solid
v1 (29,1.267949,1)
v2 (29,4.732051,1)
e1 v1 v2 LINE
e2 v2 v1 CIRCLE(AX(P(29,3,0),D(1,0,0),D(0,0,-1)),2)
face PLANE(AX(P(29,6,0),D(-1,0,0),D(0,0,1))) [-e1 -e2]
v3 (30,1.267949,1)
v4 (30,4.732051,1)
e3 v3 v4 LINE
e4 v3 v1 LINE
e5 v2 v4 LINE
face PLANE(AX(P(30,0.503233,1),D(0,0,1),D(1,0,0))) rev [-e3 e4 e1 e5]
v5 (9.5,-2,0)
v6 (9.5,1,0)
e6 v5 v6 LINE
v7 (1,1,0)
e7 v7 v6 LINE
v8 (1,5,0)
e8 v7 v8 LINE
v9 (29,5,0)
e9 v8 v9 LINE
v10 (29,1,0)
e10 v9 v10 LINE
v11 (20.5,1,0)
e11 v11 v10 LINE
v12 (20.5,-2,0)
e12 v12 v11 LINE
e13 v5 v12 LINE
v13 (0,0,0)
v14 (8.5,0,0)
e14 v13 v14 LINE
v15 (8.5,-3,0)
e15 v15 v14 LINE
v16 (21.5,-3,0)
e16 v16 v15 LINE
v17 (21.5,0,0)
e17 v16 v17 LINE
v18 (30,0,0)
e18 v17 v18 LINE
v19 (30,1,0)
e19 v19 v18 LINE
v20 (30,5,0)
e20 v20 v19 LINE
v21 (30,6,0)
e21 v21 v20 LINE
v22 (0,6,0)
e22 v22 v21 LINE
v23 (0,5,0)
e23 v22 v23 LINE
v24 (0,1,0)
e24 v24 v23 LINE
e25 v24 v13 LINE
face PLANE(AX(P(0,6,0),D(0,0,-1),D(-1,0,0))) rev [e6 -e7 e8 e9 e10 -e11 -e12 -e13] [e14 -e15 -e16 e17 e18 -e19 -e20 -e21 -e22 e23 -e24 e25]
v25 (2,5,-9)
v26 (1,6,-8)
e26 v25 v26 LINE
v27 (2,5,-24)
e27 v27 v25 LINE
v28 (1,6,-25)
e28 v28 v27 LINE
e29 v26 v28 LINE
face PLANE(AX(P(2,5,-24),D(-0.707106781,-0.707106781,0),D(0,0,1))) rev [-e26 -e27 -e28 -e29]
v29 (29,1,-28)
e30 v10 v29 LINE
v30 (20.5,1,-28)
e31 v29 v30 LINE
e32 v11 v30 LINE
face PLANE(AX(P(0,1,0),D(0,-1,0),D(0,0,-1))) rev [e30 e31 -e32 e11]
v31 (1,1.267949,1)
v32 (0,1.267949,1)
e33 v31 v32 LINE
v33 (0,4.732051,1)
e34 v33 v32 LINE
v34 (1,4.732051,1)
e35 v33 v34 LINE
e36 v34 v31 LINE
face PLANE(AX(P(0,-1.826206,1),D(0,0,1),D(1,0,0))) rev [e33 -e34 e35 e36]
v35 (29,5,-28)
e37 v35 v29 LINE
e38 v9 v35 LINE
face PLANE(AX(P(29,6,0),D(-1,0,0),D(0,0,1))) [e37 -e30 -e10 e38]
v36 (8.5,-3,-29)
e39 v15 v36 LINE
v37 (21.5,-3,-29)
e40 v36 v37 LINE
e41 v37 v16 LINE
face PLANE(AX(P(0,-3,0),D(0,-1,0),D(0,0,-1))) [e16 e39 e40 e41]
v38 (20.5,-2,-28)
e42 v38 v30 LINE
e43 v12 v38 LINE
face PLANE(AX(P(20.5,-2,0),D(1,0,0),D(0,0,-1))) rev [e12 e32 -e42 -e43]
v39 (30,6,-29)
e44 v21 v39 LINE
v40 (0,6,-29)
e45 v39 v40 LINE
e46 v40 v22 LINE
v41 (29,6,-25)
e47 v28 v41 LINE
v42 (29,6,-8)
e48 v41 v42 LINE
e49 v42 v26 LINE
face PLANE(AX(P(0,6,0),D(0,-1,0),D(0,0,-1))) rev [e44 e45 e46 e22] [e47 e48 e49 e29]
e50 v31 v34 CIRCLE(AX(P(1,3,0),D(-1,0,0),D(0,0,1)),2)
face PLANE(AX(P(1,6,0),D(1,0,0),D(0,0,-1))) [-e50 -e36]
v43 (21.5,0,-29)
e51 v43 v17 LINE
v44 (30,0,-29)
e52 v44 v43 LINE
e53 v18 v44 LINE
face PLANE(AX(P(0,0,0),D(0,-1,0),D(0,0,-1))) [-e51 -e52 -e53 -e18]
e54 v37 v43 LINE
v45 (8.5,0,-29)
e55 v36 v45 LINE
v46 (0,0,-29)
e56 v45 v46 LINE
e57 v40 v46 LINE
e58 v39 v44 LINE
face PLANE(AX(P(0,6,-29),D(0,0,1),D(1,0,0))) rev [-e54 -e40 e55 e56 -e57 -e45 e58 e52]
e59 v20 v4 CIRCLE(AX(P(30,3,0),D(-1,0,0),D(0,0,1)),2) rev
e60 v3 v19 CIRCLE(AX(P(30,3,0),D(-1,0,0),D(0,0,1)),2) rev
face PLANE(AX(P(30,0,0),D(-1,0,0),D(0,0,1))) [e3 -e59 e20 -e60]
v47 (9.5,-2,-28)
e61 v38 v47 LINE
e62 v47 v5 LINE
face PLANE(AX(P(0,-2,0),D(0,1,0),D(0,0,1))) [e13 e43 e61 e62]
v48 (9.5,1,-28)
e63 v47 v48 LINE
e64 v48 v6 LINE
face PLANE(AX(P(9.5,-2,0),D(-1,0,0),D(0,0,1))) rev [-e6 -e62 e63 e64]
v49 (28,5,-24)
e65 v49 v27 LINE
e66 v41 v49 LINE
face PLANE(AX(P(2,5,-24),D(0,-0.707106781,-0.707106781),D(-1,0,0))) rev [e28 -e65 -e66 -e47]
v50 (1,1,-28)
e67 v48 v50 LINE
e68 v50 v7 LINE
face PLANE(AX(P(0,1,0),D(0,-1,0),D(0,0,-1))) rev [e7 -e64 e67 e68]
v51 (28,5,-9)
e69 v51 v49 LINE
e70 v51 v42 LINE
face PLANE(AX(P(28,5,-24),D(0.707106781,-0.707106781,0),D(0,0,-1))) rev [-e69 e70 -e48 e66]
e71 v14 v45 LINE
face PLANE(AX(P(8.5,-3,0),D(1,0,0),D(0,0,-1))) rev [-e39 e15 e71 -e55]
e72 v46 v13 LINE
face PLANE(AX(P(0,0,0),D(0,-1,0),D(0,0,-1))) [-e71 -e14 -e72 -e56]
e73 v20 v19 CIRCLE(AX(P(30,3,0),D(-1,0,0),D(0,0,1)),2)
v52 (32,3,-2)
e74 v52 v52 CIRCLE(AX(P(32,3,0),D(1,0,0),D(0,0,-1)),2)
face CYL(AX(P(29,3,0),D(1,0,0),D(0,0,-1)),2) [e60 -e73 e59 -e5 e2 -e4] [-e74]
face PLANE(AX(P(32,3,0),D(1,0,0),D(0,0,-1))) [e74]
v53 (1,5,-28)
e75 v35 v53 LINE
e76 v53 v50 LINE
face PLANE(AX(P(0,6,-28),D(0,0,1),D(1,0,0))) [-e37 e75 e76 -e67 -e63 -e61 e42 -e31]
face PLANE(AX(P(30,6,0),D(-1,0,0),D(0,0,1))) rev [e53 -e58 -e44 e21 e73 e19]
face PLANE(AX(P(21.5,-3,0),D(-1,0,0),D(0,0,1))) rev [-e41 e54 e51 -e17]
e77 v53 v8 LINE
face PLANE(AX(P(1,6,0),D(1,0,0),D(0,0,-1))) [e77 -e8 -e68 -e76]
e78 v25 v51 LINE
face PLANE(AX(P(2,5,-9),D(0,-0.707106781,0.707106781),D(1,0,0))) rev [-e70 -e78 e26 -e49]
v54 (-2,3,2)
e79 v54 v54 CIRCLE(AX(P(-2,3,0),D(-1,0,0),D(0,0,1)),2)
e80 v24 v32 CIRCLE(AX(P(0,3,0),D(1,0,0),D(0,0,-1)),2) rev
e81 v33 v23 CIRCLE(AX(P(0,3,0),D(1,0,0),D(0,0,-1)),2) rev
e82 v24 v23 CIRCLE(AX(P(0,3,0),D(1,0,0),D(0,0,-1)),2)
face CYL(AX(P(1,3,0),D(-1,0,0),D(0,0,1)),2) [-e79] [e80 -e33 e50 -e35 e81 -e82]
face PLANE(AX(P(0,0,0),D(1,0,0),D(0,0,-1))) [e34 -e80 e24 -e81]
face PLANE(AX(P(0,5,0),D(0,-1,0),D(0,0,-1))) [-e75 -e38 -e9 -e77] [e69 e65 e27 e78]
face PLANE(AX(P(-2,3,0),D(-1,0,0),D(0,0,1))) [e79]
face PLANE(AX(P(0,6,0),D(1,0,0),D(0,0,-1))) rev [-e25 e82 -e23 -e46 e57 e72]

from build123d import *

# Parameters (mm, degrees)
ESQUISSE1_W             = 30
ESQUISSE1_H             = 29
BOSS_EXTRU_1_DEPTH      = 6
COQUE1_T                = -1
ENL_V_MAT_EXTRU_1_REACH = 44.154
ESQUISSE2_W             = 26
ESQUISSE2_H             = 15
ESQUISSE3_W             = 13
ESQUISSE3_H             = 29
BOSS_EXTRU_2_DEPTH      = 3
ESQUISSE5_W             = 11
ESQUISSE5_H             = 28
ENL_V_MAT_EXTRU_2_DEPTH = 3
BOSS_EXTRU_3_DEPTH      = 2
BOSS_EXTRU_3_DEPTH_BACK = 1
ESQUISSE6_R             = 2
BOSS_EXTRU_4_DEPTH      = 2
BOSS_EXTRU_4_DEPTH_BACK = 1
ESQUISSE7_R             = 2
CHANFREIN1_SIZE         = 1
ESQUISSE11_W            = 1
ESQUISSE11_H            = 5.866928615
ENL_V_MAT_EXTRU_5_DEPTH = 1
ESQUISSE12_W            = 1
ESQUISSE12_H            = 9.243044447
ENL_V_MAT_EXTRU_6_DEPTH = 1


with BuildPart() as part:
    # Esquisse1 → Boss.-Extru.1 (new body)
    with BuildSketch(Plane(origin=(0, 0, 0), x_dir=(1, 0, 0), z_dir=(0, 1, 0))):
        with Locations((15, 14.5)):
            Rectangle(ESQUISSE1_W, ESQUISSE1_H)
    extrude(amount=BOSS_EXTRU_1_DEPTH)

    # Coque1
    coque1_openings = [part.faces().sort_by_distance(p)[0] for p in [
        (15, 3, 0),
    ]]
    offset(amount=COQUE1_T, openings=coque1_openings, kind=Kind.INTERSECTION)

    # Esquisse2 → Enlèv. mat.-Extru.1 (cut, up to next)
    with BuildSketch(Plane(origin=(0, 6, 0), x_dir=(1, 0, 0), z_dir=(0, 1, 0)), mode=Mode.PRIVATE) as enl_v_mat_extru_1_sk1:
        with Locations((15, 16.5)):
            Rectangle(ESQUISSE2_W, ESQUISSE2_H)
    enl_v_mat_extru_1_tool1 = extrude(enl_v_mat_extru_1_sk1.sketch, amount=-ENL_V_MAT_EXTRU_1_REACH, mode=Mode.PRIVATE) & part.part
    add(enl_v_mat_extru_1_tool1.solids().sort_by_distance((15, 6, -16.5))[0], mode=Mode.SUBTRACT)

    # Esquisse3 → Boss.-Extru.2 (add)
    with BuildSketch(Plane.XZ):
        with Locations((15, -14.5)):
            Rectangle(ESQUISSE3_W, ESQUISSE3_H)
    extrude(amount=BOSS_EXTRU_2_DEPTH)

    # Esquisse5 → Enlèv. mat.-Extru.2 (cut)
    with BuildSketch(Plane(origin=(0, 1, 0), x_dir=(1, 0, 0), z_dir=(0, 1, 0))):
        with Locations((15, 14)):
            Rectangle(ESQUISSE5_W, ESQUISSE5_H)
    extrude(amount=-ENL_V_MAT_EXTRU_2_DEPTH, mode=Mode.SUBTRACT)

    # Esquisse6 → Boss.-Extru.3 (add, two sides: drawn at the far end of the back side and taken through both)
    with BuildSketch(Plane(origin=(30, 0, 0), x_dir=(0, 0, -1), z_dir=(1, 0, 0)).offset(-BOSS_EXTRU_3_DEPTH_BACK)):
        with Locations((0, 3)):
            Circle(ESQUISSE6_R)
    extrude(amount=BOSS_EXTRU_3_DEPTH + BOSS_EXTRU_3_DEPTH_BACK)

    # Esquisse7 → Boss.-Extru.4 (add, two sides: drawn at the far end of the back side and taken through both)
    with BuildSketch(Plane.ZY.offset(-BOSS_EXTRU_4_DEPTH_BACK)):
        with Locations(Location((0, 3, 0), (0, 0, 180))):
            Circle(ESQUISSE7_R)
    extrude(amount=BOSS_EXTRU_4_DEPTH + BOSS_EXTRU_4_DEPTH_BACK)

    # Chanfrein1
    chanfrein1_edges = [part.edges().sort_by_distance(p)[0] for p in [
        (15, 6, -24),
        (28, 6, -16.5),
        (15, 6, -9),
        (2, 6, -16.5),
    ]]
    chamfer(chanfrein1_edges, length=CHANFREIN1_SIZE - 0.0001)  # a hair under: the kernel refuses the full size

    # Esquisse11 → Enlèv. mat.-Extru.5 (cut)
    with BuildSketch(Plane.ZY.offset(-29)):
        with Locations((0.5, 3.436697282)):
            Rectangle(ESQUISSE11_W, ESQUISSE11_H)
    extrude(amount=-ENL_V_MAT_EXTRU_5_DEPTH, mode=Mode.SUBTRACT)

    # Esquisse12 → Enlèv. mat.-Extru.6 (cut)
    with BuildSketch(Plane(origin=(1, 0, 0), x_dir=(0, 0, -1), z_dir=(1, 0, 0))):
        with Locations((-0.5, 2.795315934)):
            Rectangle(ESQUISSE12_W, ESQUISSE12_H)
    extrude(amount=-ENL_V_MAT_EXTRU_6_DEPTH, mode=Mode.SUBTRACT)


solid = part.part
